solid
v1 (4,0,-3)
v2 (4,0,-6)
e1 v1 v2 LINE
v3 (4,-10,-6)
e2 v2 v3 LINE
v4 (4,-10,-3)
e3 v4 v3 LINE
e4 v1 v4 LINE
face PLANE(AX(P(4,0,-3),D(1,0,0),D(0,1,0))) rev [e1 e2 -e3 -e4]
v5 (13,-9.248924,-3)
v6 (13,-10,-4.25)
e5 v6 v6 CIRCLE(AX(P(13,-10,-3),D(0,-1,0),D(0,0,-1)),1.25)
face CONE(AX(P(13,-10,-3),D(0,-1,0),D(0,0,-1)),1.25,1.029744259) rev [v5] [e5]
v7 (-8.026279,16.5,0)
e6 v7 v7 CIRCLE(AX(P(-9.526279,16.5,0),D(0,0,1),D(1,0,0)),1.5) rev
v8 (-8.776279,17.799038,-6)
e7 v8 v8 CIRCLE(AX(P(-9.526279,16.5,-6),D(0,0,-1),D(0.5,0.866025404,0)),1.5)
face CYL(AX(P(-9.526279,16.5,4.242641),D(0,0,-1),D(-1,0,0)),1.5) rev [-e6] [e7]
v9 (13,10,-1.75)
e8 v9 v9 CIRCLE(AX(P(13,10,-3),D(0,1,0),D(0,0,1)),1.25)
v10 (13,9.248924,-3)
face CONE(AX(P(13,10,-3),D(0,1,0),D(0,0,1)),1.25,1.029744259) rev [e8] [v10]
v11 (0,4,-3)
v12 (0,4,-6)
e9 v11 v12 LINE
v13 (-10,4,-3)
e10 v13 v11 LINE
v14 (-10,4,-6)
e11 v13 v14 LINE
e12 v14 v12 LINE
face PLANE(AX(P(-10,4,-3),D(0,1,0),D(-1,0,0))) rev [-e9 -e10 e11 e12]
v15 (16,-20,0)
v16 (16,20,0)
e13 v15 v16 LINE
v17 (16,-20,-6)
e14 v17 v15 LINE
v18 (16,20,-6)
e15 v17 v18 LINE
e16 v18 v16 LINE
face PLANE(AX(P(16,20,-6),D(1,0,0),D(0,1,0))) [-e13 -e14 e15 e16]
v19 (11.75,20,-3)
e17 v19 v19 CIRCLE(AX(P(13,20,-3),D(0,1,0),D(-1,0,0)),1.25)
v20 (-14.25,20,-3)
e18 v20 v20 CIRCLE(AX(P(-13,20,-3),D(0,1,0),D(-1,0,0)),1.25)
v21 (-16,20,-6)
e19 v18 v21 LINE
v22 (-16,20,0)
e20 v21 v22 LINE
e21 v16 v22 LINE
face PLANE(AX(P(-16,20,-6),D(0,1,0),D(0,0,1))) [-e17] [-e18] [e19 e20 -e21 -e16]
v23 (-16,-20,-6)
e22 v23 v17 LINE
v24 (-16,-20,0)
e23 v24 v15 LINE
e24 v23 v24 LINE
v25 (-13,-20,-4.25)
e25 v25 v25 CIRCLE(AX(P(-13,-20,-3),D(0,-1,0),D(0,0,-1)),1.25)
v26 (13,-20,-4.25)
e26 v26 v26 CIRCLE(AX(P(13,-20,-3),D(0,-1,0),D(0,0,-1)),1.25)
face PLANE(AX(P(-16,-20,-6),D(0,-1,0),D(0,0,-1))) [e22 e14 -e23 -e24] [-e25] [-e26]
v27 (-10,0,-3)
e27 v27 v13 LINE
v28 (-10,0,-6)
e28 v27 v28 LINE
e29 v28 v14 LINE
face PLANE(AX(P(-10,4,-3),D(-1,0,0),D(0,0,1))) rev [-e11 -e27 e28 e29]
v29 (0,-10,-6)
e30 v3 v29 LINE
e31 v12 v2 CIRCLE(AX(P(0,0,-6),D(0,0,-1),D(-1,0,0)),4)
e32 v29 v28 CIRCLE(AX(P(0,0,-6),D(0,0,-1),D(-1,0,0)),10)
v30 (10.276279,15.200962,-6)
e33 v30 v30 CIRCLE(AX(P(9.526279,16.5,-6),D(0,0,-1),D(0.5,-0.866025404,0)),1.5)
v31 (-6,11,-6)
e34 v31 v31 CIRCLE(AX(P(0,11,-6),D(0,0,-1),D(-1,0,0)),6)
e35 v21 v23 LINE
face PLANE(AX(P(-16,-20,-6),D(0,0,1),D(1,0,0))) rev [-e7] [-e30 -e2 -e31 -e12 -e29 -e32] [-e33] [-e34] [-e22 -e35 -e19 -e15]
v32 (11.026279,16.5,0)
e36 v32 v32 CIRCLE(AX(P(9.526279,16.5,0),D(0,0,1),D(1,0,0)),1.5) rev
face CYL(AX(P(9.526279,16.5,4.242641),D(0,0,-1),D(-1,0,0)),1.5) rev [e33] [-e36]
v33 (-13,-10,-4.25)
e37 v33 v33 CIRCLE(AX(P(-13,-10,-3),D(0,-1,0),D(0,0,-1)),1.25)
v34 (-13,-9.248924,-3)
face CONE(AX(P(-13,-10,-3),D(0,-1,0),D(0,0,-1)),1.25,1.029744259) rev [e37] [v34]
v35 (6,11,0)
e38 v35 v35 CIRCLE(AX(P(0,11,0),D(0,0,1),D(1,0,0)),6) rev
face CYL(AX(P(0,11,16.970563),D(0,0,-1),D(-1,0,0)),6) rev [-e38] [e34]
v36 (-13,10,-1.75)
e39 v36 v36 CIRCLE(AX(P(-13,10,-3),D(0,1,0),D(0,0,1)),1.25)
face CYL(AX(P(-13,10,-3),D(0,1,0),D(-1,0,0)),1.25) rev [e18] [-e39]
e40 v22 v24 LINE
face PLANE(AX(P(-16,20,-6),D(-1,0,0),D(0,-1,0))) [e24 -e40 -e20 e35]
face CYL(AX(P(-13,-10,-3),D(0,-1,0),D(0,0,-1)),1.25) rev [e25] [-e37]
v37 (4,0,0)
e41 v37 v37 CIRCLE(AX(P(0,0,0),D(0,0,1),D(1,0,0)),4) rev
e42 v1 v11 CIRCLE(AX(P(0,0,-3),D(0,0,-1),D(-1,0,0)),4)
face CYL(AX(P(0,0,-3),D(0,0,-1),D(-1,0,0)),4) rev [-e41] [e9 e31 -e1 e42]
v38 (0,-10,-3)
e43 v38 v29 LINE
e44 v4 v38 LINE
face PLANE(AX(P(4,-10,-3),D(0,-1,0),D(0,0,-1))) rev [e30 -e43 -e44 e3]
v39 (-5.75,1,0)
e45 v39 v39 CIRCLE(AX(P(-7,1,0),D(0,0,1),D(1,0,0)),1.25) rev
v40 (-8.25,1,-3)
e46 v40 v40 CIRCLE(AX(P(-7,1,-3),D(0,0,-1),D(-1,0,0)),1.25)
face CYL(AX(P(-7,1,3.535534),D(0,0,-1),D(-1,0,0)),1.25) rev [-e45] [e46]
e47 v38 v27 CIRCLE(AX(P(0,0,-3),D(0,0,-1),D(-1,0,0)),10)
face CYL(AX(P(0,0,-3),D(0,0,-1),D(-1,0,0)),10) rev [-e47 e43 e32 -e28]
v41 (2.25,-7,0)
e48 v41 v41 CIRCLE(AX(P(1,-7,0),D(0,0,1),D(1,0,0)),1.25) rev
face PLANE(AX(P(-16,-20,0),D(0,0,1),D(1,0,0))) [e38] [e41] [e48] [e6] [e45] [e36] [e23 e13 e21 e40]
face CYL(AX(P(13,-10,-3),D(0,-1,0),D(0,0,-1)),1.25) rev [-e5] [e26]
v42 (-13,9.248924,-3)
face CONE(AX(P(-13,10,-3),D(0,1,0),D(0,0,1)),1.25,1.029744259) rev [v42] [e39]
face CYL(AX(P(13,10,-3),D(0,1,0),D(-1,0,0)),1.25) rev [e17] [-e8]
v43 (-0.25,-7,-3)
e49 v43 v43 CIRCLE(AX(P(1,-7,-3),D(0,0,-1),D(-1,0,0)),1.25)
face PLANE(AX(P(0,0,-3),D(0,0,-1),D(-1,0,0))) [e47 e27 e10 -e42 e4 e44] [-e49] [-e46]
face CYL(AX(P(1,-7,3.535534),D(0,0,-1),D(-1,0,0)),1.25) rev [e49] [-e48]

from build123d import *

# Parameters (mm, degrees)
SKETCH1_W           = 32
SKETCH1_H           = 40
EXTRUDE1_DEPTH      = 6
SKETCH8_R           = 6
CUT_EXTRUDE6_DEPTH  = 6
SKETCH5_R           = 1.5
CUT_EXTRUDE4_DEPTH  = 6
CIRPATTERN1_COUNT   = 3
CUT_EXTRUDE13_DEPTH = 3
SKETCH20_R          = 4
CUT_EXTRUDE14_DEPTH = 3
SKETCH25_R          = 1.25
EXTRUDE4_DEPTH      = 3
SKETCH29_R          = 1.25
EXTRUDE7_DEPTH      = 10
EXTRUDE13_START     = -10
SKETCH27_R          = 1.25
EXTRUDE13_DEPTH     = 10


# Read off the part's stored shape, not the designer's step: M3 Tapped Hole2
with BuildPart() as part:
    # Sketch1 → Extrude1 (new body)
    with BuildSketch(Plane.XY):
        Rectangle(SKETCH1_W, SKETCH1_H)
    extrude(amount=-EXTRUDE1_DEPTH)

    # Sketch8 → Cut-Extrude6 (cut)
    with BuildSketch(Plane(origin=(0, 0, -6), x_dir=(-1, 0, 0), z_dir=(0, 0, -1))):
        with Locations((0, 11)):
            Circle(SKETCH8_R)
    extrude(amount=-CUT_EXTRUDE6_DEPTH, mode=Mode.SUBTRACT)

    # Sketch5 → Cut-Extrude4 (cut)
    with BuildSketch(Plane(origin=(0, 0, -6), x_dir=(-1, 0, 0), z_dir=(0, 0, -1))):
        Circle(SKETCH5_R)
    cut_extrude4 = extrude(amount=-CUT_EXTRUDE4_DEPTH, mode=Mode.SUBTRACT)

    # CirPattern1: Cut-Extrude4 ×3 about axis
    cirpattern1_axis = Axis((0, 11, 0), (0, 0, 1))
    for i in range(1, CIRPATTERN1_COUNT):
        add(cut_extrude4.rotate(cirpattern1_axis, i * 360 / CIRPATTERN1_COUNT), mode=Mode.SUBTRACT)

    # Sketch19 → Cut-Extrude13 (cut)
    with BuildSketch(Plane(origin=(0, 0, -6), x_dir=(-1, 0, 0), z_dir=(0, 0, -1))):
        with BuildLine():
            Line((10, 4), (0, 4))
            ThreePointArc((0, 4), (-2.828427125, 2.828427125), (-4, 0))
            Line((-4, 0), (-4, -10))
            Line((-4, -10), (0, -10))
            ThreePointArc((0, -10), (7.071067812, -7.071067812), (10, 0))
            Line((10, 0), (10, 4))
        make_face()
    extrude(amount=-CUT_EXTRUDE13_DEPTH, mode=Mode.SUBTRACT)

    # Sketch20 → Cut-Extrude14 (cut)
    with BuildSketch(Plane(origin=(0, 0, -3), x_dir=(-1, 0, 0), z_dir=(0, 0, -1))):
        with Locations(Location((0, 0, 0), (0, 0, 180))):
            Circle(SKETCH20_R)
    extrude(amount=-CUT_EXTRUDE14_DEPTH, mode=Mode.SUBTRACT)

    # Sketch25 → Extrude4 (cut)
    with BuildSketch(Plane(origin=(0, 0, -3), x_dir=(-1, 0, 0), z_dir=(0, 0, -1))):
        with Locations((-1, -7)):
            Circle(SKETCH25_R)
        with Locations((7, 1)):
            Circle(SKETCH25_R)
    extrude(amount=-EXTRUDE4_DEPTH, mode=Mode.SUBTRACT)

    # Sketch29 → Extrude7 (cut)
    with BuildSketch(Plane.XZ.offset(20)):
        with Locations(Location((-13, -3, 0), (0, 0, 270))):
            Circle(SKETCH29_R)
        with Locations(Location((13, -3, 0), (0, 0, 270))):
            Circle(SKETCH29_R)
    extrude(amount=-EXTRUDE7_DEPTH, mode=Mode.SUBTRACT)

    # Sketch27 → Extrude13 (cut)
    with BuildSketch(Plane(origin=(0, 20, 0), x_dir=(1, 0, 0), z_dir=(0, 1, 0)).offset(EXTRUDE13_START)):
        with Locations(Location((-13, 3, 0), (0, 0, 90))):
            Circle(SKETCH27_R)
        with Locations(Location((13, 3, 0), (0, 0, 90))):
            Circle(SKETCH27_R)
    extrude(amount=EXTRUDE13_DEPTH, mode=Mode.SUBTRACT)

    # M3 Tapped Hole2 outline → M3 Tapped Hole2 (revolve, cut)
    with BuildSketch(Plane(origin=(13, 0, -3), x_dir=(1, 0, 0), z_dir=(0, 0, 1))):
        Polygon((1.25, -10), (0, -9.248924226), (0, -10), align=None)
        Polygon((0, 10), (0, 9.248924226), (1.25, 10), align=None)
    revolve(axis=Axis((13, 0, -3), (0, 1, 0)), mode=Mode.SUBTRACT)

    # M3 Tapped Hole2 2 outline → M3 Tapped Hole2 2 (revolve, cut)
    with BuildSketch(Plane(origin=(-13, 0, -3), x_dir=(1, 0, 0), z_dir=(0, 0, 1))):
        Polygon((1.25, -10), (0, -9.248924226), (0, -10), align=None)
        Polygon((0, 10), (0, 9.248924226), (1.25, 10), align=None)
    revolve(axis=Axis((-13, 0, -3), (0, 1, 0)), mode=Mode.SUBTRACT)


solid = part.part
